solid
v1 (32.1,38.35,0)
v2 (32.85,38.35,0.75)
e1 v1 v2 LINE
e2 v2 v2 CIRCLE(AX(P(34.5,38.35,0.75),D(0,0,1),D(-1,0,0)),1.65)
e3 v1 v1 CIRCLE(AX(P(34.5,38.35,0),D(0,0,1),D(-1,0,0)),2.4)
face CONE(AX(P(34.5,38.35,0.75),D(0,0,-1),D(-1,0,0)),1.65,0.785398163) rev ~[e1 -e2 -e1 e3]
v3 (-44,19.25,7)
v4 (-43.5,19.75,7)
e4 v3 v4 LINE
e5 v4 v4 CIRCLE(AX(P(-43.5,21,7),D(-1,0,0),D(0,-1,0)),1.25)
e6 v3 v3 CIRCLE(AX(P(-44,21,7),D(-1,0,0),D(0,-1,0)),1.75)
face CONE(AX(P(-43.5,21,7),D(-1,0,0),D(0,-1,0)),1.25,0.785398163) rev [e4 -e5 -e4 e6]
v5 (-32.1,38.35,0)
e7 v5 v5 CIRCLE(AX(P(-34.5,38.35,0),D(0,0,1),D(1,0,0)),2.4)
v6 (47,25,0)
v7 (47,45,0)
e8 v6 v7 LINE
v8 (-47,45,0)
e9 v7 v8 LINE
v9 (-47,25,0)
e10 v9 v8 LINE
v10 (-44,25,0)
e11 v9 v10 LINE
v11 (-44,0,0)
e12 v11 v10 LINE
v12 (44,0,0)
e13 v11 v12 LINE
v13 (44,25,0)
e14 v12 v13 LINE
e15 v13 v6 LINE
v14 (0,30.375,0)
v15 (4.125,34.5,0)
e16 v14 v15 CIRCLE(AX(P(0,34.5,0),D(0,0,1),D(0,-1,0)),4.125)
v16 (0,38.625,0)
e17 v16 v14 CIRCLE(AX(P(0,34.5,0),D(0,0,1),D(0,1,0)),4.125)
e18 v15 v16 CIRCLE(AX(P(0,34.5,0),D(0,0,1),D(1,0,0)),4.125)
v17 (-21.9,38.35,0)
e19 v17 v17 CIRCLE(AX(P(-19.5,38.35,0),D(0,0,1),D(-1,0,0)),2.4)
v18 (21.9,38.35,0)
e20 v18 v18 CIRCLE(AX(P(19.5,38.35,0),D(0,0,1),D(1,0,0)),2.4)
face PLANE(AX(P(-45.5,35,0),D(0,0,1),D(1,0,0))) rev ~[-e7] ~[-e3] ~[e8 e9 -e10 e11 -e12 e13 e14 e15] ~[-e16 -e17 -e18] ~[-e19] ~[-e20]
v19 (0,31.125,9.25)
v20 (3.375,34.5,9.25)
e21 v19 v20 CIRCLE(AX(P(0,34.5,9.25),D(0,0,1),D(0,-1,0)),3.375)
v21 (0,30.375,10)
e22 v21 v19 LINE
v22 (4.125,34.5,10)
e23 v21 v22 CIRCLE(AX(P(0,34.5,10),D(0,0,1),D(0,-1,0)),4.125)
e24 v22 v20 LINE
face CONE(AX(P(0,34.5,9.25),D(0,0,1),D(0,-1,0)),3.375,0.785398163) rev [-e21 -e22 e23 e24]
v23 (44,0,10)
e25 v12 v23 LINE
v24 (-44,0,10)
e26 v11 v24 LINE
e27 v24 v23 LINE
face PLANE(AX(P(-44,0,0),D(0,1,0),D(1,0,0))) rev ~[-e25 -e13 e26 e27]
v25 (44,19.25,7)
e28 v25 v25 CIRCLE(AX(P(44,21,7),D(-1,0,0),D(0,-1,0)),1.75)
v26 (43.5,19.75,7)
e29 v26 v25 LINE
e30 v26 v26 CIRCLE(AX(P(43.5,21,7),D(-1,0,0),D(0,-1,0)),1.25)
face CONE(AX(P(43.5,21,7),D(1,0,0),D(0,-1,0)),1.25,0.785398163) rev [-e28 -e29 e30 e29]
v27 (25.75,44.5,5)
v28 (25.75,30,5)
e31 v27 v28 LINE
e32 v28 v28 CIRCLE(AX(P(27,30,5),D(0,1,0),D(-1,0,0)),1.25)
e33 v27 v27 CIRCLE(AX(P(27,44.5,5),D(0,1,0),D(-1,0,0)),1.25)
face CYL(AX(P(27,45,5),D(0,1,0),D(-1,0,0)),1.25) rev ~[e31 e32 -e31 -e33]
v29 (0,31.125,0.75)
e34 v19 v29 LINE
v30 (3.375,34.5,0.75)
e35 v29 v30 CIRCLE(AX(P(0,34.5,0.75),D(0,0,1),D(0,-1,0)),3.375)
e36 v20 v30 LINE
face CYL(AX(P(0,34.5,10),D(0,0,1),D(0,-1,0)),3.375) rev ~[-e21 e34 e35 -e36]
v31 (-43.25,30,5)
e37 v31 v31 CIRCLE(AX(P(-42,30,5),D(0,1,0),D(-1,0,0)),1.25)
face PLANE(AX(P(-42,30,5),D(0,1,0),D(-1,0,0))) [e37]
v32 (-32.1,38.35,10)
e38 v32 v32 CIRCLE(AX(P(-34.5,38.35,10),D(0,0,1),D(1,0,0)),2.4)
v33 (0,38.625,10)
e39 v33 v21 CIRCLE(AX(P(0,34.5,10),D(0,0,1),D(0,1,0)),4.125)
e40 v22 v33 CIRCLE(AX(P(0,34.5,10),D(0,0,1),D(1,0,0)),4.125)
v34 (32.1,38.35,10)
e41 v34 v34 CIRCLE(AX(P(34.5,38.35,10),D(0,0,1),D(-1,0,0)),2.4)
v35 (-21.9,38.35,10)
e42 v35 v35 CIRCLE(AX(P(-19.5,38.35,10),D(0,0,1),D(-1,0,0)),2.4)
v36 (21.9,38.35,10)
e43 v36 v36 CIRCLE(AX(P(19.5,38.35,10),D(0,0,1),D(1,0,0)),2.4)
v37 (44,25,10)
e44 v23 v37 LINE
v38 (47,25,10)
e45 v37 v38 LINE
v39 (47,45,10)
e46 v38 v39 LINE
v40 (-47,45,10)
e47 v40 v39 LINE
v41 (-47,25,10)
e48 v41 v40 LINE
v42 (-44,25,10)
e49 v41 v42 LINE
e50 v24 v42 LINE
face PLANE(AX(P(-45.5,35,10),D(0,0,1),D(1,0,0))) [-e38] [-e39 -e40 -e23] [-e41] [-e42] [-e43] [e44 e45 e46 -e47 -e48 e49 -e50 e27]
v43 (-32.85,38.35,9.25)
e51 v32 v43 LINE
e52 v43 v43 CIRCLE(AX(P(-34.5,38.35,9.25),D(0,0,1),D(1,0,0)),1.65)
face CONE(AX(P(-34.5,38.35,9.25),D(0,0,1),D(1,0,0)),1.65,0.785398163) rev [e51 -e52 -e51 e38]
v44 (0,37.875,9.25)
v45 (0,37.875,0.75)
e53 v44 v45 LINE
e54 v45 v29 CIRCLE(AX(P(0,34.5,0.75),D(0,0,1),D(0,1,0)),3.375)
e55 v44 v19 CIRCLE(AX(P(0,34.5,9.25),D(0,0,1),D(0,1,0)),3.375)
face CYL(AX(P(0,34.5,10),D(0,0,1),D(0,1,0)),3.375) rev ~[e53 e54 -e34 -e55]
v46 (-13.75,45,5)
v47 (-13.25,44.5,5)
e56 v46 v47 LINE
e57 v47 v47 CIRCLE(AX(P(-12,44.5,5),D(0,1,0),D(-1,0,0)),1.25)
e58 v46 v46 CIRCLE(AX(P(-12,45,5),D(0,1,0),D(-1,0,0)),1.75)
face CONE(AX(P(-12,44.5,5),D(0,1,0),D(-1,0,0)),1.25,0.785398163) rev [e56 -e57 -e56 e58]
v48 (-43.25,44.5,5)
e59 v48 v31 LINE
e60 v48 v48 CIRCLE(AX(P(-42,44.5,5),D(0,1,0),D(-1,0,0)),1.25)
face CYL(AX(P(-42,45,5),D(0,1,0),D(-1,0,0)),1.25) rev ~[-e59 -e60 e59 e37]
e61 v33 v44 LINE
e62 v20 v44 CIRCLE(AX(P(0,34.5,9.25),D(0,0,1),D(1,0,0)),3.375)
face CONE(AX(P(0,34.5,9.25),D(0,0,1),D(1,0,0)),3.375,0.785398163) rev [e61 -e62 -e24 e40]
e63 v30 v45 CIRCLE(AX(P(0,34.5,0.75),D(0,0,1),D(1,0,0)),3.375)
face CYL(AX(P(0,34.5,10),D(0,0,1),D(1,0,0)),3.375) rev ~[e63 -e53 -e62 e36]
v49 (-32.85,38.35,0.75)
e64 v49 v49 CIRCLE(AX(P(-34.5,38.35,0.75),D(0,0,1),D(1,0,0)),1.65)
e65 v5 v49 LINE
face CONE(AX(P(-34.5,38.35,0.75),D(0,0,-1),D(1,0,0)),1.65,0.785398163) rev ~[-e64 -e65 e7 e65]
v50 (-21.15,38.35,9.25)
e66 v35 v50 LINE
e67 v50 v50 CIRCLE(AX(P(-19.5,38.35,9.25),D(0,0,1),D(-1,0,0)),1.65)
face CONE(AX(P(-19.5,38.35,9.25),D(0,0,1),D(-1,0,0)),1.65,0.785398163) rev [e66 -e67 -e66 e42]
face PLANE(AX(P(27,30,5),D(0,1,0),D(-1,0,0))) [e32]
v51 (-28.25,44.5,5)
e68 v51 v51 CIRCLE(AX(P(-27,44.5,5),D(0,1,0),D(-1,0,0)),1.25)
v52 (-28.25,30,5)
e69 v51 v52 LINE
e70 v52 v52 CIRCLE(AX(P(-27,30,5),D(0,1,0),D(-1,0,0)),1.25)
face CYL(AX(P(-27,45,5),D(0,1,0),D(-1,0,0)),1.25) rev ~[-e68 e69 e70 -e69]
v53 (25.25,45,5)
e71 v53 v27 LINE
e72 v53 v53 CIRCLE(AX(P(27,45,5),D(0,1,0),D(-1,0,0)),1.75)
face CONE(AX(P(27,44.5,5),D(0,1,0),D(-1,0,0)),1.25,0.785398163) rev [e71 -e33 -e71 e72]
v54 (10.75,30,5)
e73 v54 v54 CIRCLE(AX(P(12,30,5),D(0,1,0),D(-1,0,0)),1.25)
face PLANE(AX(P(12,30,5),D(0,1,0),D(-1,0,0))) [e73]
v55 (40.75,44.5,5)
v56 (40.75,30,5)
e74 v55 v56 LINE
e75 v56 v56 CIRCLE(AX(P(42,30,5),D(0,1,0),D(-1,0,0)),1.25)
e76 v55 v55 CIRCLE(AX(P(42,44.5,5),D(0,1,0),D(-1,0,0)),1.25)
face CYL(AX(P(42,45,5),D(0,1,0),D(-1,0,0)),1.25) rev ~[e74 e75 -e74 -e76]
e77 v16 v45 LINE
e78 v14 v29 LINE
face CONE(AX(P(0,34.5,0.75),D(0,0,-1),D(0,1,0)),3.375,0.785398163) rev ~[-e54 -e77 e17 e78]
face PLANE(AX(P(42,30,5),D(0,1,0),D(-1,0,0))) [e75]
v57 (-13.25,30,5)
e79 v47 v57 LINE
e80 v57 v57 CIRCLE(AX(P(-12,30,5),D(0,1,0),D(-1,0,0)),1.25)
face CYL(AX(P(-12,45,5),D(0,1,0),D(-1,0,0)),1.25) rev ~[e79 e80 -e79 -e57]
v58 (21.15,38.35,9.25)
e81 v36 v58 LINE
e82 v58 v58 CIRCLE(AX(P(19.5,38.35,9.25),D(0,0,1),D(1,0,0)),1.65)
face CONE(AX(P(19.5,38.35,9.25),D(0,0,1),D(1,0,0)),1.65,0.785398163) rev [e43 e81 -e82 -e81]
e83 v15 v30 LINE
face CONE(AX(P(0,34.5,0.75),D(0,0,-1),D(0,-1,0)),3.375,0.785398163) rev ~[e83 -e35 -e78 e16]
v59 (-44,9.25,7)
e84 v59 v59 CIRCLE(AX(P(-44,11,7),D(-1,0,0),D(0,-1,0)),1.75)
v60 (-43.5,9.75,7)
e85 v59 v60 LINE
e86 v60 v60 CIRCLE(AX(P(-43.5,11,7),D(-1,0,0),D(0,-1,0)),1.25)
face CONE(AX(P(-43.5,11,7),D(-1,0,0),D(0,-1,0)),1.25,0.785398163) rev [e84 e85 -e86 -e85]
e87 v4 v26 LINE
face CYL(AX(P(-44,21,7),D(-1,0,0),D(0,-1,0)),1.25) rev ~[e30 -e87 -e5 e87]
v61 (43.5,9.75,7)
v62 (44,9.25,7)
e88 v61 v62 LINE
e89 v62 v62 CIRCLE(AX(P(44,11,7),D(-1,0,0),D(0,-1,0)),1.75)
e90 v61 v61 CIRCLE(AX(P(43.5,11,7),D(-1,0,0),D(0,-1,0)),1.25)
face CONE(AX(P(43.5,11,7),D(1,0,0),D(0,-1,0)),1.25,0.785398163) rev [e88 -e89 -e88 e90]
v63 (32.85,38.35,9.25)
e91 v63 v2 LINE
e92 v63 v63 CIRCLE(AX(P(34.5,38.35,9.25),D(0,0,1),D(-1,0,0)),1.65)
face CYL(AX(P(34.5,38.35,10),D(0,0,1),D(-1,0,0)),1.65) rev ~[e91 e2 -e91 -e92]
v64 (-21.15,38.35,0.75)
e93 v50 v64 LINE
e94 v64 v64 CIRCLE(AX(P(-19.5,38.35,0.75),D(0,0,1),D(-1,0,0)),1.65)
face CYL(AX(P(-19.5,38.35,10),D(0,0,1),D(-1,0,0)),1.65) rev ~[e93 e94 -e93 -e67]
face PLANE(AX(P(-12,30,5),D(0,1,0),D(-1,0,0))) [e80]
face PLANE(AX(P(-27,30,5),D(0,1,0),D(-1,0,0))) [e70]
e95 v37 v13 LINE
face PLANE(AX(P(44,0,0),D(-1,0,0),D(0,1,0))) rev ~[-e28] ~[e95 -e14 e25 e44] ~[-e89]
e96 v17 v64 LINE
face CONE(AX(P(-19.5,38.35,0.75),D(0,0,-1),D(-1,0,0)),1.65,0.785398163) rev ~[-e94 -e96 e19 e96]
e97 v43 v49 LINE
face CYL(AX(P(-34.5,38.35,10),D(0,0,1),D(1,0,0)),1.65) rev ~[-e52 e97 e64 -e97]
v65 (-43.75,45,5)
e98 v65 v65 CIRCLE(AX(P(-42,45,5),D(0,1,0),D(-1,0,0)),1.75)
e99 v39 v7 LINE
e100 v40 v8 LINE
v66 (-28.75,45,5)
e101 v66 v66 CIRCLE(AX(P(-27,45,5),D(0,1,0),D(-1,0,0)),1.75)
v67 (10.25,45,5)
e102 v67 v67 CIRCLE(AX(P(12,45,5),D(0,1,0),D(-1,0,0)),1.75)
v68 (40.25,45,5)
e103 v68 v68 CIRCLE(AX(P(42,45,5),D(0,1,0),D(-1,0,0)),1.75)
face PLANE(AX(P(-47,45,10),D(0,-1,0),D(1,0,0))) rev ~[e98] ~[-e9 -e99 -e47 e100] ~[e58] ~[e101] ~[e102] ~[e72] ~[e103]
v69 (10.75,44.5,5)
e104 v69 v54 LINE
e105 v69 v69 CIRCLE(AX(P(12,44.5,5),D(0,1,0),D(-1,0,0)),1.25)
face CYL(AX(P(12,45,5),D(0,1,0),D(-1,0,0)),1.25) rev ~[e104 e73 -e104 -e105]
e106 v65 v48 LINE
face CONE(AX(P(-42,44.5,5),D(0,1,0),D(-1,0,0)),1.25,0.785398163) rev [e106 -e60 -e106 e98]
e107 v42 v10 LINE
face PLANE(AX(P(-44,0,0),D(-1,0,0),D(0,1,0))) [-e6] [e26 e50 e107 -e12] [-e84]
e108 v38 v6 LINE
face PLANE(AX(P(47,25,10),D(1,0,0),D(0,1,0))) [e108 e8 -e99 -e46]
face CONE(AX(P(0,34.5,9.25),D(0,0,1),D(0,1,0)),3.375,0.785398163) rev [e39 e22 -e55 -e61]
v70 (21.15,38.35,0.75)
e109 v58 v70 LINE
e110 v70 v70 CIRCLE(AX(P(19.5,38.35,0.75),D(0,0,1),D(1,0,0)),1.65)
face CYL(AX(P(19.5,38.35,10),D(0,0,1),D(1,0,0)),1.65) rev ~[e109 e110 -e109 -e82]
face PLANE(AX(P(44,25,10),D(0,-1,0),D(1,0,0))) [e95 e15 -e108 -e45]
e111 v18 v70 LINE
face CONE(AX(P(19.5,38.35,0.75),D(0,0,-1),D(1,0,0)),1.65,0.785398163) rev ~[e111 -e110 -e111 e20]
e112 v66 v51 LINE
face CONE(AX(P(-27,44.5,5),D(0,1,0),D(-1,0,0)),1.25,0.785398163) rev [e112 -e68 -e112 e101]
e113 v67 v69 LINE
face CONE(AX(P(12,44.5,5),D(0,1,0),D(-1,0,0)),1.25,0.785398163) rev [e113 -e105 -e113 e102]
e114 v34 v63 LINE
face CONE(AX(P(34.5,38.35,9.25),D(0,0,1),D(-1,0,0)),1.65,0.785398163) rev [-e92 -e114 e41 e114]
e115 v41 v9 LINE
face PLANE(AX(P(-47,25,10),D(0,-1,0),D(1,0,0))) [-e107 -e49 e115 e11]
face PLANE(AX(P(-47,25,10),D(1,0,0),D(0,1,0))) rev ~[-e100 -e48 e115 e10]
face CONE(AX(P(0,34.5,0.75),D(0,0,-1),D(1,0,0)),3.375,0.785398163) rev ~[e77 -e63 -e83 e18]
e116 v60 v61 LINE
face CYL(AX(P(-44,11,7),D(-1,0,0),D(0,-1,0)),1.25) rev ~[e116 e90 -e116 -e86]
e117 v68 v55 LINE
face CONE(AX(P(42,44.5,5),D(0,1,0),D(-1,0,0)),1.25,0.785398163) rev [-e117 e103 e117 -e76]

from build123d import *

# Parameters (mm, degrees)
F0_W      = 44
F0_H      = 45
F1_DEPTH  = 10
F2_R      = 1.25
F3_DEPTH  = 88.001
F4_SIZE   = 0.5
F5_W      = 3
F5_H      = 20
F6_DEPTH  = 10
F7_R      = 1.65
F8_DEPTH  = 10.001
F9_SIZE   = 0.75
F10_R     = 1.25
F11_DEPTH = 15
F12_SIZE  = 0.5


with BuildPart() as f1:
    # F0 (on Top) → F1 (new body)
    with BuildSketch(Plane.XY):
        with Locations((-22, 22.5)):
            Rectangle(F0_W, F0_H)
        with Locations((22, 22.5)):
            Rectangle(F0_W, F0_H)
    extrude(amount=F1_DEPTH)

    # F2 (on face) → F3 (cut, through all)
    with BuildSketch(Plane(origin=(-44, 0, 0), x_dir=(0, -1, 0), z_dir=(-1, 0, 0))):
        with Locations((-21, 7)):
            Circle(F2_R)
        with Locations((-11, 7)):
            Circle(F2_R)
    extrude(amount=-F3_DEPTH, mode=Mode.SUBTRACT)

    # F4
    f4_edges = [f1.edges().sort_by_distance(p)[0] for p in [
        (-44, 22.25, 7),
        (-44, 12.25, 7),
        (44, 12.25, 7),
        (44, 22.25, 7),
    ]]
    chamfer(f4_edges, length=F4_SIZE)

    # F5 (on face) → F6 (join, through all)
    with BuildSketch(Plane.XY.offset(10)):
        with Locations((-45.5, 35)):
            Rectangle(F5_W, F5_H)
        with Locations((45.5, 35)):
            Rectangle(F5_W, F5_H)
    extrude(amount=-F6_DEPTH)

    # F7 (on face) → F8 (cut, through all)
    with BuildSketch(Plane.XY.offset(10)):
        with BuildLine():
            Line((0, 31.125), (0, 37.875))
            ThreePointArc((0, 37.875), (-3.375, 34.5), (0, 31.125))
        make_face()
        with BuildLine():
            ThreePointArc((0, 31.125), (2.3864853865, 32.1135146135), (3.375, 34.5))
            ThreePointArc((3.375, 34.5), (2.3864853865, 36.8864853865), (0, 37.875))
            Line((0, 37.875), (0, 31.125))
        make_face()
        with Locations((-34.5, 38.35)):
            Circle(F7_R)
        with BuildLine():
            ThreePointArc((-17.85, 38.35), (-19.5, 40), (-21.15, 38.35))
            ThreePointArc((-21.15, 38.35), (-19.5, 36.7), (-17.85, 38.35))
        make_face()
        with Locations((19.5, 38.35)):
            Circle(F7_R)
        with BuildLine():
            ThreePointArc((36.15, 38.35), (34.5, 40), (32.85, 38.35))
            ThreePointArc((32.85, 38.35), (34.5, 36.7), (36.15, 38.35))
        make_face()
    extrude(amount=-F8_DEPTH, mode=Mode.SUBTRACT)

    # F9
    f9_edges = [f1.edges().sort_by_distance(p)[0] for p in [
        (0, 37.875, 10),
        (0, 37.875, 0),
        (-36.15, 38.35, 10),
        (-17.85, 38.35, 10),
        (17.85, 38.35, 10),
        (36.15, 38.35, 10),
        (36.15, 38.35, 0),
        (17.85, 38.35, 0),
        (-17.85, 38.35, 0),
        (-36.15, 38.35, 0),
    ]]
    chamfer(f9_edges, length=F9_SIZE)

    # F10 (on face) → F11 (cut)
    with BuildSketch(Plane(origin=(0, 45, 0), x_dir=(-1, 0, 0), z_dir=(0, 1, 0))):
        with Locations((-42, 4.9999999996)):
            Circle(F10_R)
        with Locations((42, 4.9999999996)):
            Circle(F10_R)
        with Locations((-27, 4.9999999996)):
            Circle(F10_R)
        with Locations((-12, 4.9999999996)):
            Circle(F10_R)
        with Locations((12, 4.9999999996)):
            Circle(F10_R)
        with Locations((27, 4.9999999996)):
            Circle(F10_R)
    extrude(amount=-F11_DEPTH, mode=Mode.SUBTRACT)

    # F12
    f12_edges = [f1.edges().sort_by_distance(p)[0] for p in [
        (43.25, 45, 5),
        (-40.75, 45, 5),
        (28.25, 45, 5),
        (13.25, 45, 5),
        (-10.75, 45, 5),
        (-25.75, 45, 5),
    ]]
    chamfer(f12_edges, length=F12_SIZE)


solid = f1.part
